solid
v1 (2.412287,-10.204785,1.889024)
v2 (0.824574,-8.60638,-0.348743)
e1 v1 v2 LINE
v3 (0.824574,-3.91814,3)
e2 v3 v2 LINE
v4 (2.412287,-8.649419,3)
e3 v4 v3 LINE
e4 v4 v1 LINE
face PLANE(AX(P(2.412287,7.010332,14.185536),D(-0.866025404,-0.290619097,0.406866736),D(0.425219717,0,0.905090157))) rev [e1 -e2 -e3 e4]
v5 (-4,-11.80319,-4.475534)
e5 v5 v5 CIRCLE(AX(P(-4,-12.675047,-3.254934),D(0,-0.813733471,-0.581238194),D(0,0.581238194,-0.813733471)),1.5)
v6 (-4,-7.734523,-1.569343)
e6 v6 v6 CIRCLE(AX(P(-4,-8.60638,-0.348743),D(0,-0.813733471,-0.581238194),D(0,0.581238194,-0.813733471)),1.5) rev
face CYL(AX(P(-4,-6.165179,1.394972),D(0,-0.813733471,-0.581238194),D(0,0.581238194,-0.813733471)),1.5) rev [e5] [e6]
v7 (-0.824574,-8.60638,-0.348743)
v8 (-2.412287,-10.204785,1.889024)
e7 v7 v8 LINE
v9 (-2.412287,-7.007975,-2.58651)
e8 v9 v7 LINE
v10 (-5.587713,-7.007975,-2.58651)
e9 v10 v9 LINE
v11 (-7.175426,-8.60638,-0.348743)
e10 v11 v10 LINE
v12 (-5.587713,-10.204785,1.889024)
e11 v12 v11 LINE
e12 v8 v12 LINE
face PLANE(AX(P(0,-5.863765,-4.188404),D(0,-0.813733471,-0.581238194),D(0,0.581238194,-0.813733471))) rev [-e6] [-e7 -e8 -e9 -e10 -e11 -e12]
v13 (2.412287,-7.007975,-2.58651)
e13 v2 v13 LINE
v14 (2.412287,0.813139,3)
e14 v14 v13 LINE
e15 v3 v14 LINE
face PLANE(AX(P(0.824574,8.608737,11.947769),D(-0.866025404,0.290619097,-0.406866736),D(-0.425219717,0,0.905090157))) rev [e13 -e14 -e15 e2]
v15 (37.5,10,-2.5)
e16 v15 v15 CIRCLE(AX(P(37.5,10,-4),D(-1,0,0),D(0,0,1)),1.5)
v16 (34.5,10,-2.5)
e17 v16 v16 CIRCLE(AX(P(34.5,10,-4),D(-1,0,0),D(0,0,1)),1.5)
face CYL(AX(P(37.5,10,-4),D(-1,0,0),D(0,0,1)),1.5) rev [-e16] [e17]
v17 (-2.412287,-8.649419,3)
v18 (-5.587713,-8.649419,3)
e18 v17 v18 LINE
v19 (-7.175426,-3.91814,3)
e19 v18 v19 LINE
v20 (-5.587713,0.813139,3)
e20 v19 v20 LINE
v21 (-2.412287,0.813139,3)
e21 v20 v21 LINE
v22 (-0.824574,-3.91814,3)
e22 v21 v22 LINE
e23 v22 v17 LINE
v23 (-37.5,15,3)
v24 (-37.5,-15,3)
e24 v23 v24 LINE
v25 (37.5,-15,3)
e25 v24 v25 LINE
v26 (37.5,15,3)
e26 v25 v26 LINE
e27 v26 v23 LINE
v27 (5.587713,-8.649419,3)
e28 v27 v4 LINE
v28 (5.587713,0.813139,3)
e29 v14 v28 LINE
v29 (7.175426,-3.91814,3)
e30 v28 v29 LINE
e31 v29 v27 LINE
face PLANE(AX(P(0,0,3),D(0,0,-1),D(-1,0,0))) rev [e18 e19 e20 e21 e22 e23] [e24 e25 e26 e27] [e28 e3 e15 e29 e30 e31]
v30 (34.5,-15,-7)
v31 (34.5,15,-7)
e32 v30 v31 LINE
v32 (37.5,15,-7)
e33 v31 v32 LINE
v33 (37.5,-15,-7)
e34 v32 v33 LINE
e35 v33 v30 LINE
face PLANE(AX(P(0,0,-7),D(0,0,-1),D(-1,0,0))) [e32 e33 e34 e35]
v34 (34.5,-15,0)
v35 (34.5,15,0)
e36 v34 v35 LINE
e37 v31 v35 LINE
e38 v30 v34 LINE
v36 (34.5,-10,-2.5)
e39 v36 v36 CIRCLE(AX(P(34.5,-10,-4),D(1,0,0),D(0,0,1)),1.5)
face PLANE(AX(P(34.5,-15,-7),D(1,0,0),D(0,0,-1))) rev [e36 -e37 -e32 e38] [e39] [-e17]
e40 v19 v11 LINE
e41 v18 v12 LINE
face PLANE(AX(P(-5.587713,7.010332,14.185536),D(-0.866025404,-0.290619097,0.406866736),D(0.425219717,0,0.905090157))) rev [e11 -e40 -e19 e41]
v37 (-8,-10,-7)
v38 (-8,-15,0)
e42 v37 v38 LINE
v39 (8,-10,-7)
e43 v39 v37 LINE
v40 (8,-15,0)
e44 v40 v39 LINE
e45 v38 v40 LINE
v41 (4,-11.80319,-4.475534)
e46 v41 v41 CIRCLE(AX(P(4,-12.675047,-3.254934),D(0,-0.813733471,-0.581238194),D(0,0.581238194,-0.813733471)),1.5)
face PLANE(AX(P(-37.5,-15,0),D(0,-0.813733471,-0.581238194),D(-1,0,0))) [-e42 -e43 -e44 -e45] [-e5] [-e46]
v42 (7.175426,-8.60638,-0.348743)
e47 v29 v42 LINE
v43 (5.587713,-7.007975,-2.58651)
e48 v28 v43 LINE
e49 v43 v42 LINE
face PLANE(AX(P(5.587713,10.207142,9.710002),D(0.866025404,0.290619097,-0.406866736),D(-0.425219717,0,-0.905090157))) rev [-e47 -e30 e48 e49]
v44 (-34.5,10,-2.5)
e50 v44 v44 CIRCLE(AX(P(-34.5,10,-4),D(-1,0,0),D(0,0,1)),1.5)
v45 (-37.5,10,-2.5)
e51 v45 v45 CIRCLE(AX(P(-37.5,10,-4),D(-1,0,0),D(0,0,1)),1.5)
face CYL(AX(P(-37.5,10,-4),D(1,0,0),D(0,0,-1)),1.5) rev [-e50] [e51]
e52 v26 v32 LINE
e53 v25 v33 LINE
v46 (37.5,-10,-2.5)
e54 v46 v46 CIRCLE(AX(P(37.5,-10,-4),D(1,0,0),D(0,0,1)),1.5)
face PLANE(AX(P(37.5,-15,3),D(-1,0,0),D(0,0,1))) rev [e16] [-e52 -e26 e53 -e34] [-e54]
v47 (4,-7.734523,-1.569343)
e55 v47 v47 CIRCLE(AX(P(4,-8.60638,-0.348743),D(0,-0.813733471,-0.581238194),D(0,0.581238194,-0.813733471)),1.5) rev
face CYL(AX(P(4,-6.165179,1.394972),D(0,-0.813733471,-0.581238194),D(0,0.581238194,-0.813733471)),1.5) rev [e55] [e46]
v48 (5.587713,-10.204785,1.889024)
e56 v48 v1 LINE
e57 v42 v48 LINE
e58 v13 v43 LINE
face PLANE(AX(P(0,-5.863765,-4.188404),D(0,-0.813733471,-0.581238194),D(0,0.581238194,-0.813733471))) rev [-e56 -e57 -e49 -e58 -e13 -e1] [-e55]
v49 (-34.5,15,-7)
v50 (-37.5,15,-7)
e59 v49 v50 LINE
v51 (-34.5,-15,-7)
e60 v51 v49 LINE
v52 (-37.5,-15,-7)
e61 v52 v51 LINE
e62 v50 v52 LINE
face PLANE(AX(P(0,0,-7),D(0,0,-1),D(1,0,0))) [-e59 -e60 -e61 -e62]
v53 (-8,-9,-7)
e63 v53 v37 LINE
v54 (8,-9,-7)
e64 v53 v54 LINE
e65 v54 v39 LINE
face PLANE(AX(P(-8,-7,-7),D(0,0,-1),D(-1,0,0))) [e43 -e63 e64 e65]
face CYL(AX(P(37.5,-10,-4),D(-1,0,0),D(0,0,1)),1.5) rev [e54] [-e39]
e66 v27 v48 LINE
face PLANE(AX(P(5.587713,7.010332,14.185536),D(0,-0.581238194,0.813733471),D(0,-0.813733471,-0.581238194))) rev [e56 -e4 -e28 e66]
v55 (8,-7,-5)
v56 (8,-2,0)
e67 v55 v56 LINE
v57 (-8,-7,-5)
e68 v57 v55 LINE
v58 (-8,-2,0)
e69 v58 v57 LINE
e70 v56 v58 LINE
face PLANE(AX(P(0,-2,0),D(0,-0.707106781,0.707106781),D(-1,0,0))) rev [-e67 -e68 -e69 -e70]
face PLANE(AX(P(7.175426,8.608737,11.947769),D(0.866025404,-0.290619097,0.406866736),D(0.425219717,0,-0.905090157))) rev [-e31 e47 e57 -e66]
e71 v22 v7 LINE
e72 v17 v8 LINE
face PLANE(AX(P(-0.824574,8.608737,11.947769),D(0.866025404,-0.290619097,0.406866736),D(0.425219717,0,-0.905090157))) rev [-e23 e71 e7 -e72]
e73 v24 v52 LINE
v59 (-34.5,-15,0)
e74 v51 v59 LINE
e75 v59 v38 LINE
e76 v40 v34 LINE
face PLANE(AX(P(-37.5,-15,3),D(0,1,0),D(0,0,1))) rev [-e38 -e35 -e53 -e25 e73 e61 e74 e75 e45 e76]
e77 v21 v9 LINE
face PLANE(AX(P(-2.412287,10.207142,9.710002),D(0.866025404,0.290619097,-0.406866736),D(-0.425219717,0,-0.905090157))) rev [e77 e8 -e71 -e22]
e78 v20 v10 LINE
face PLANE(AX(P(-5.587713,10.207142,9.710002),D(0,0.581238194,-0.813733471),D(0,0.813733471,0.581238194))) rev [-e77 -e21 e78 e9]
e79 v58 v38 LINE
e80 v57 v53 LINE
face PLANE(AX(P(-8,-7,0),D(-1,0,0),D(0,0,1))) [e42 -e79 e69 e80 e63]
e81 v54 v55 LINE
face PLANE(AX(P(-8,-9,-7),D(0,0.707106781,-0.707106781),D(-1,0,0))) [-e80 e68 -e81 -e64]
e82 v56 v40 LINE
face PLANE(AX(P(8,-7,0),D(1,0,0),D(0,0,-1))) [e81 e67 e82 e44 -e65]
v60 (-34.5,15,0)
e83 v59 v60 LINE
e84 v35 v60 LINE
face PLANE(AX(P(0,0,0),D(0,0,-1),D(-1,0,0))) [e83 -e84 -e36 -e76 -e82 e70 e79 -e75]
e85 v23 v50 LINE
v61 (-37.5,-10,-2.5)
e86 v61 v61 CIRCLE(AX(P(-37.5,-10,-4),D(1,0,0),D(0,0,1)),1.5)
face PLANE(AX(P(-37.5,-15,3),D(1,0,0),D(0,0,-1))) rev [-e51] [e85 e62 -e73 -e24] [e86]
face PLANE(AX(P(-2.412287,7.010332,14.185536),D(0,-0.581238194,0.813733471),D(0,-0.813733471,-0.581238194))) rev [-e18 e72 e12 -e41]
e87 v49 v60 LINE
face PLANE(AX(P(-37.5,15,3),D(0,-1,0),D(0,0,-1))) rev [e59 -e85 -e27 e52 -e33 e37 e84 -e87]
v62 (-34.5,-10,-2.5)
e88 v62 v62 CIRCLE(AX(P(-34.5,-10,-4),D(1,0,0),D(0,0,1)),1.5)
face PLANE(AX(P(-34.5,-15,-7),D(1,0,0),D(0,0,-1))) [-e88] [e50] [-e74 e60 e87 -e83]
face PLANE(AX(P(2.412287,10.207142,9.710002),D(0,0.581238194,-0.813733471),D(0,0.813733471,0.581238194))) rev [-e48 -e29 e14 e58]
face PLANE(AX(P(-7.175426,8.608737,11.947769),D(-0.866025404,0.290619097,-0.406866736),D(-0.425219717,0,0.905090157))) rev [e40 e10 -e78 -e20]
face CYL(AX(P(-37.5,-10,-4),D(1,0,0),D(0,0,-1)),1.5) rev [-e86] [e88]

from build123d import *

# Parameters (mm, degrees)
SKETCH1_W               = 75
SKETCH1_H               = 30
BOSS_EXTRUDE1_DEPTH     = 3
SKETCH2_W               = 3
SKETCH2_H               = 30
BOSS_EXTRUDE2_DEPTH     = 7
SKETCH4_R               = 1.5
CUT_EXTRUDE1_DEPTH      = 3
MIRROR1_COPY_1_SKETCH_R = 1.5
MIRROR1_COPY_1_DEPTH    = 3
SKETCH5_W               = 16
SKETCH5_H               = 7
BOSS_EXTRUDE3_DEPTH     = 8
CHAMFER1_SIZE           = 5
CHAMFER1_SIZE2          = 7
CHAMFER2_SIZE           = 5
CHAMFER3_SIZE           = 2
SKETCH6_R               = 1.5
CUT_EXTRUDE2_DEPTH      = 8
CUT_EXTRUDE3_START      = -5
CUT_EXTRUDE3_DEPTH      = 42.149507332


with BuildPart() as part:
    # Sketch1 → Boss-Extrude1 (new body)
    with BuildSketch(Plane.XY):
        Rectangle(SKETCH1_W, SKETCH1_H)
    extrude(amount=BOSS_EXTRUDE1_DEPTH)

    # Sketch2 → Boss-Extrude2 (add)
    with BuildSketch(Plane(origin=(0, 0, 0), x_dir=(-1, 0, 0), z_dir=(0, 0, -1))):
        with Locations((-36, 0)):
            Rectangle(SKETCH2_W, SKETCH2_H)
    boss_extrude2 = extrude(amount=BOSS_EXTRUDE2_DEPTH)

    # Sketch4 → Cut-Extrude1 (cut)
    with BuildSketch(Plane.ZY.offset(-34.5)):
        with Locations((-4, 10)):
            Circle(SKETCH4_R)
    cut_extrude1 = extrude(amount=-CUT_EXTRUDE1_DEPTH, mode=Mode.SUBTRACT)

    # Mirror2: Cut-Extrude1 across plane
    add(cut_extrude1.mirror(Plane.ZX), mode=Mode.SUBTRACT)

    # Mirror1: Boss-Extrude2, Cut-Extrude1 across plane
    add(boss_extrude2.mirror(Plane(origin=(0, 0, 0), x_dir=(0, 0, 1), z_dir=(1, 0, 0))))
    add(cut_extrude1.mirror(Plane(origin=(0, 0, 0), x_dir=(0, 0, 1), z_dir=(1, 0, 0))), mode=Mode.SUBTRACT)

    # Mirror1 copy 1 sketch → Mirror1 copy 1 (cut)
    with BuildSketch(Plane(origin=(-34.5, 0, 0), x_dir=(0, 0, 1), z_dir=(1, 0, 0))):
        with Locations((-4, 10)):
            Circle(MIRROR1_COPY_1_SKETCH_R)
    extrude(amount=-MIRROR1_COPY_1_DEPTH, mode=Mode.SUBTRACT)

    # Sketch5 → Boss-Extrude3 (add)
    with BuildSketch(Plane.XZ.offset(15)):
        with Locations((0, -3.5)):
            Rectangle(SKETCH5_W, SKETCH5_H)
    extrude(amount=-BOSS_EXTRUDE3_DEPTH)

    # Chamfer1
    chamfer1_edges = [part.edges().sort_by_distance(p)[0] for p in [
        (0, -15, -7),
    ]]
    chamfer1_side = [part.faces().sort_by_distance(p)[0] for p in [
        (0, -11, -7),
    ]]
    chamfer(chamfer1_edges, length=CHAMFER1_SIZE, length2=CHAMFER1_SIZE2, reference=chamfer1_side[0])

    # Chamfer2
    chamfer2_edges = [part.edges().sort_by_distance(p)[0] for p in [
        (0, -7, 0),
    ]]
    chamfer(chamfer2_edges, length=CHAMFER2_SIZE)

    # Chamfer3
    chamfer3_edges = [part.edges().sort_by_distance(p)[0] for p in [
        (0, -7, -7),
    ]]
    chamfer(chamfer3_edges, length=CHAMFER3_SIZE - 0.0001)  # a hair under: the kernel refuses the full size

    # Sketch6 → Cut-Extrude2 (cut)
    with BuildSketch(Plane(origin=(0, -9.932432432, -7.094594595), x_dir=(1, 0, 0), z_dir=(0, -0.8137334712067358, -0.5812381937190955))):
        with Locations(Location((-4, 4.718572906, 0), (0, 0, 270))):
            Circle(SKETCH6_R)
        with Locations(Location((4, 4.718572906, 0), (0, 0, 270))):
            Circle(SKETCH6_R)
    extrude(amount=-CUT_EXTRUDE2_DEPTH, mode=Mode.SUBTRACT)

    # Sketch7 → Cut-Extrude3 (cut, through all)
    with BuildSketch(Plane(origin=(0, -9.932432432, -7.094594595), x_dir=(1, 0, 0), z_dir=(0, -0.8137334712067358, -0.5812381937190955)).offset(CUT_EXTRUDE3_START)):
        Polygon((-0.824573519, 4.718572906), (-2.41228676, 7.468572906), (-5.58771324, 7.468572906), (-7.175426481, 4.718572906), (-5.58771324, 1.968572906), (-2.41228676, 1.968572906), align=None)
        Polygon((7.175426481, 4.718572906), (5.58771324, 7.468572906), (2.41228676, 7.468572906), (0.824573519, 4.718572906), (2.41228676, 1.968572906), (5.58771324, 1.968572906), align=None)
    extrude(amount=-CUT_EXTRUDE3_DEPTH, mode=Mode.SUBTRACT)


solid = part.part
